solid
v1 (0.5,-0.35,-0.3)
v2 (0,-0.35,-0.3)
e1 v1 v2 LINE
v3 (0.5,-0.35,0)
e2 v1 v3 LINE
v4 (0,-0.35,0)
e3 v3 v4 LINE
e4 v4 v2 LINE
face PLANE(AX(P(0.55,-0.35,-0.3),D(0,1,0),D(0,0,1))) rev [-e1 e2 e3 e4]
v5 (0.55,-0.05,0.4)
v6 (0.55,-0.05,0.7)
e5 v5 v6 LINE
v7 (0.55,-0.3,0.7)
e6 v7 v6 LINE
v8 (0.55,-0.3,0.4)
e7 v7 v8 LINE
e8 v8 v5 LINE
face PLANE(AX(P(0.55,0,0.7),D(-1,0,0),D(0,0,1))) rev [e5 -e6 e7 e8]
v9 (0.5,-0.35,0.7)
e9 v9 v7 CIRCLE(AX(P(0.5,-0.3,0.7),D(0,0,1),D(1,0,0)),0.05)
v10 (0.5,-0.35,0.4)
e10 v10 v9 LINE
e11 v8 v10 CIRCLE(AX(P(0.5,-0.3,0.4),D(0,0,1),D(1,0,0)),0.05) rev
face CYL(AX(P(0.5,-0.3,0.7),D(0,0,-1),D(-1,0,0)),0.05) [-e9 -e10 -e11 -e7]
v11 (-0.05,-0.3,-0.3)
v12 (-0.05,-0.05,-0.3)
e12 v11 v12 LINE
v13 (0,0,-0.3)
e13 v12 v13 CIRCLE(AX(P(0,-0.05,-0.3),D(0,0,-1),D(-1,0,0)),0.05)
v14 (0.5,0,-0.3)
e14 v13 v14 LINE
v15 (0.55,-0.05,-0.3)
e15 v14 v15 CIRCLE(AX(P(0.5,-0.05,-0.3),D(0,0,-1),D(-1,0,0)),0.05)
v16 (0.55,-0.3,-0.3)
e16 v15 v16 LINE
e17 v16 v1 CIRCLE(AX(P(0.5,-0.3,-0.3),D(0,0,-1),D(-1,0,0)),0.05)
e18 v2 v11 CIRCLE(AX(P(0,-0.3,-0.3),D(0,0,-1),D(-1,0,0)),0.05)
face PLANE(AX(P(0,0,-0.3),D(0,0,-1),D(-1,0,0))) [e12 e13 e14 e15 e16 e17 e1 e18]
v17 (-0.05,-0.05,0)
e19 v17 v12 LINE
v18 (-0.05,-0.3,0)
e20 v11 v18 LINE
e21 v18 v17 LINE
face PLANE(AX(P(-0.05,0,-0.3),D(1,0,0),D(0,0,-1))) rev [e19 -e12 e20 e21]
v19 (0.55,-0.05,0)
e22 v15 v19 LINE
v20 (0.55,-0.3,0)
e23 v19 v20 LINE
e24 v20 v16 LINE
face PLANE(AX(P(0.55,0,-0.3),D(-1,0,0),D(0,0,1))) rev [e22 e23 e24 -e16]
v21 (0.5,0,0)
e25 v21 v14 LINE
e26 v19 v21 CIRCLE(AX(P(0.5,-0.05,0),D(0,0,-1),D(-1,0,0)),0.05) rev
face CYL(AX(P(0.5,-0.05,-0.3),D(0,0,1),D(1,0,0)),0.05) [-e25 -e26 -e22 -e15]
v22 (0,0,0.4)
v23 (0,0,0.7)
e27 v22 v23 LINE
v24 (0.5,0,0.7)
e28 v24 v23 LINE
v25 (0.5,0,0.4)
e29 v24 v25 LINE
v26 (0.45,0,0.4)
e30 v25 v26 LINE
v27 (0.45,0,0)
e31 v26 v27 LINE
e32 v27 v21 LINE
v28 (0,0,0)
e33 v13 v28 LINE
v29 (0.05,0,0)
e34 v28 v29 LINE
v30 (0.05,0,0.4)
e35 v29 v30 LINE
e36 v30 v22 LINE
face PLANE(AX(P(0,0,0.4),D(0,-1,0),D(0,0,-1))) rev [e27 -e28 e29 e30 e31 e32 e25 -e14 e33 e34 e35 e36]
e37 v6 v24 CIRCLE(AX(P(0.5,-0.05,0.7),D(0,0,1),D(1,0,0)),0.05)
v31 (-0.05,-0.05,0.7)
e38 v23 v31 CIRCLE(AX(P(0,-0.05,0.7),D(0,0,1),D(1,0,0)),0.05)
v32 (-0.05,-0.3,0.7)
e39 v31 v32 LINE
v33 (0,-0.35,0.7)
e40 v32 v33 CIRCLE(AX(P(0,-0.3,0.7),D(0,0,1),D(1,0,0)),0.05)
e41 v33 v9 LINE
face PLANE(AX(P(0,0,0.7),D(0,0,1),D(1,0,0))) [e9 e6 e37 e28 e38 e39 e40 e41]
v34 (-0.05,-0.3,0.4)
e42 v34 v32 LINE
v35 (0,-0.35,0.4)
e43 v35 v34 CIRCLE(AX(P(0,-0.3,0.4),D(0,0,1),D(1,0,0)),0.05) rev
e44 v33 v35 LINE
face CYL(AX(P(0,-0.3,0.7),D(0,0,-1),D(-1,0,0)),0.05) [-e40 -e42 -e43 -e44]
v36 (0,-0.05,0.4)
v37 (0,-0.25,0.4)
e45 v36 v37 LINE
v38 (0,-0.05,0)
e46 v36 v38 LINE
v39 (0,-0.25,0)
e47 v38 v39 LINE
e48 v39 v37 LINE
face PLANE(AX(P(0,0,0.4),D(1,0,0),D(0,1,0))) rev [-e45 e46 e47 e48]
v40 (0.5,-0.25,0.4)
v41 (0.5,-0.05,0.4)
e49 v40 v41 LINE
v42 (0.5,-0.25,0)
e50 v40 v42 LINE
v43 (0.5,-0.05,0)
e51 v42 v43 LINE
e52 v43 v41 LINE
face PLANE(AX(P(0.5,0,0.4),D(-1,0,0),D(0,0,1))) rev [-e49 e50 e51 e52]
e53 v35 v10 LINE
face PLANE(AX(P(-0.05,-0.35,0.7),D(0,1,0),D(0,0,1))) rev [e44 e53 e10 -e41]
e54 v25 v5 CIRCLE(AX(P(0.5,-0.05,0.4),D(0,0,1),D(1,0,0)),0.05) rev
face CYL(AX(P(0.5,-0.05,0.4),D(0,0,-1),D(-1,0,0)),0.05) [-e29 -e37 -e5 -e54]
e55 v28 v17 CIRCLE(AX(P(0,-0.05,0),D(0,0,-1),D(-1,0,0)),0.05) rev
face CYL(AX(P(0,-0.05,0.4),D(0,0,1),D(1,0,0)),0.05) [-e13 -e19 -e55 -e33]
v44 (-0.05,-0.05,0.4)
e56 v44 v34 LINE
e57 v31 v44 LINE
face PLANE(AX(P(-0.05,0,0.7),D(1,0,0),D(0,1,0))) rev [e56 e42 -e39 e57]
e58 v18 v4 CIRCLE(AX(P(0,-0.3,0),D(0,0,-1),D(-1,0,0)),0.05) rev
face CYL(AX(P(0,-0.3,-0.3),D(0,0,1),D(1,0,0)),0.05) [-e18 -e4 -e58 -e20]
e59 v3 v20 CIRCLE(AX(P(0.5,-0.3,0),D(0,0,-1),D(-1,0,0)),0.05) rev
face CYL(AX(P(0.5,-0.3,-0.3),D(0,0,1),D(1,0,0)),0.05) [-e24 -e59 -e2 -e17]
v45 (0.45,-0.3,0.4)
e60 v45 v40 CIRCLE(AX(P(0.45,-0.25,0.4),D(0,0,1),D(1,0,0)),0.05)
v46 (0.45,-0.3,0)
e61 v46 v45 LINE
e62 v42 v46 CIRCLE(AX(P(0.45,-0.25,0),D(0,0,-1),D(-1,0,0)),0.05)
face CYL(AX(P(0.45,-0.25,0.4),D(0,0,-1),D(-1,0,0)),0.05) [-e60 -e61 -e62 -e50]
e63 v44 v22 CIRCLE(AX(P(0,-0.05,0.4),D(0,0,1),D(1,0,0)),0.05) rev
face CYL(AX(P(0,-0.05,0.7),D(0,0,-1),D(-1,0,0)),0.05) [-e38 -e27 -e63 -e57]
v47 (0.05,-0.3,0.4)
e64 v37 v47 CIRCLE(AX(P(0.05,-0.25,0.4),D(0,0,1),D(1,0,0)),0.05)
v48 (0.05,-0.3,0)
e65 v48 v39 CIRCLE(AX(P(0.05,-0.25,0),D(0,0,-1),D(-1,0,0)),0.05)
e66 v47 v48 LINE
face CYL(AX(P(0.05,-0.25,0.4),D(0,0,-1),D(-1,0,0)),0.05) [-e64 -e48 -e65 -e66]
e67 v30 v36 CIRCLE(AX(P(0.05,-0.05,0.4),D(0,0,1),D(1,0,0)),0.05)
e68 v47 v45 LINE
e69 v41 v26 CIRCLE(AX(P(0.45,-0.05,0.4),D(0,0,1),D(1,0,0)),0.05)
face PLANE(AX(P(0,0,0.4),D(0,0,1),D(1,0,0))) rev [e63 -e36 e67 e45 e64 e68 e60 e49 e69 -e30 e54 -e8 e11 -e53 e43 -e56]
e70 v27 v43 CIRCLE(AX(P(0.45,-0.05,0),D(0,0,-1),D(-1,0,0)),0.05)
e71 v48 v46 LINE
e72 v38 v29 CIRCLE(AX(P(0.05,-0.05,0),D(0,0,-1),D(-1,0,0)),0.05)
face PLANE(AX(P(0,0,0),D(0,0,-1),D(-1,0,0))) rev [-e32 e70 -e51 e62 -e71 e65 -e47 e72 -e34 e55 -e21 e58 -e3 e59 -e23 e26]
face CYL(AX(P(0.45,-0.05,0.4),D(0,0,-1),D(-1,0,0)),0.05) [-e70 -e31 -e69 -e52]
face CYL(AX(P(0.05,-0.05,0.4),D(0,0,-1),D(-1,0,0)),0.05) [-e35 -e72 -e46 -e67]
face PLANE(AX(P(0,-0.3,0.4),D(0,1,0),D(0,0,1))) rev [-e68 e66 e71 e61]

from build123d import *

# Parameters (mm, degrees)
SKETCH2_W           = 0.5
SKETCH2_H           = 0.3
BOSS_EXTRUDE1_DEPTH = 0.4
SKETCH3_W           = 0.6
SKETCH3_H           = 0.35
BOSS_EXTRUDE2_DEPTH = 0.3
SKETCH4_W           = 0.6
SKETCH4_H           = 0.35
BOSS_EXTRUDE4_DEPTH = 0.3
FILLET2_R           = 0.05


with BuildPart() as part:
    # Sketch2 → Boss-Extrude1 (new body)
    with BuildSketch(Plane.XY):
        with Locations((0.25, -0.15)):
            Rectangle(SKETCH2_W, SKETCH2_H)
    extrude(amount=BOSS_EXTRUDE1_DEPTH)

    # Sketch3 → Boss-Extrude2 (add)
    with BuildSketch(Plane.XY.offset(0.4)):
        with Locations((0.25, -0.175)):
            Rectangle(SKETCH3_W, SKETCH3_H)
    extrude(amount=BOSS_EXTRUDE2_DEPTH)

    # Sketch4 → Boss-Extrude4 (add)
    with BuildSketch(Plane(origin=(0, 0, 0), x_dir=(-1, 0, 0), z_dir=(0, 0, -1))):
        with Locations((-0.25, -0.175)):
            Rectangle(SKETCH4_W, SKETCH4_H)
    extrude(amount=BOSS_EXTRUDE4_DEPTH)

    # Fillet2
    fillet2_edges = [part.edges().sort_by_distance(p)[0] for p in [
        (0.55, -0.35, 0.55),
        (-0.05, -0.35, 0.55),
        (-0.05, -0.35, -0.15),
        (0.55, -0.35, -0.15),
        (0.5, -0.3, 0.2),
        (0, -0.3, 0.2),
        (0.55, 0, 0.55),
        (-0.05, 0, 0.55),
        (0, 0, 0.2),
        (0.5, 0, 0.2),
        (0.55, 0, -0.15),
        (-0.05, 0, -0.15),
    ]]
    fillet(fillet2_edges, radius=FILLET2_R - 0.0001)  # a hair under: the kernel refuses the full size


solid = part.part
